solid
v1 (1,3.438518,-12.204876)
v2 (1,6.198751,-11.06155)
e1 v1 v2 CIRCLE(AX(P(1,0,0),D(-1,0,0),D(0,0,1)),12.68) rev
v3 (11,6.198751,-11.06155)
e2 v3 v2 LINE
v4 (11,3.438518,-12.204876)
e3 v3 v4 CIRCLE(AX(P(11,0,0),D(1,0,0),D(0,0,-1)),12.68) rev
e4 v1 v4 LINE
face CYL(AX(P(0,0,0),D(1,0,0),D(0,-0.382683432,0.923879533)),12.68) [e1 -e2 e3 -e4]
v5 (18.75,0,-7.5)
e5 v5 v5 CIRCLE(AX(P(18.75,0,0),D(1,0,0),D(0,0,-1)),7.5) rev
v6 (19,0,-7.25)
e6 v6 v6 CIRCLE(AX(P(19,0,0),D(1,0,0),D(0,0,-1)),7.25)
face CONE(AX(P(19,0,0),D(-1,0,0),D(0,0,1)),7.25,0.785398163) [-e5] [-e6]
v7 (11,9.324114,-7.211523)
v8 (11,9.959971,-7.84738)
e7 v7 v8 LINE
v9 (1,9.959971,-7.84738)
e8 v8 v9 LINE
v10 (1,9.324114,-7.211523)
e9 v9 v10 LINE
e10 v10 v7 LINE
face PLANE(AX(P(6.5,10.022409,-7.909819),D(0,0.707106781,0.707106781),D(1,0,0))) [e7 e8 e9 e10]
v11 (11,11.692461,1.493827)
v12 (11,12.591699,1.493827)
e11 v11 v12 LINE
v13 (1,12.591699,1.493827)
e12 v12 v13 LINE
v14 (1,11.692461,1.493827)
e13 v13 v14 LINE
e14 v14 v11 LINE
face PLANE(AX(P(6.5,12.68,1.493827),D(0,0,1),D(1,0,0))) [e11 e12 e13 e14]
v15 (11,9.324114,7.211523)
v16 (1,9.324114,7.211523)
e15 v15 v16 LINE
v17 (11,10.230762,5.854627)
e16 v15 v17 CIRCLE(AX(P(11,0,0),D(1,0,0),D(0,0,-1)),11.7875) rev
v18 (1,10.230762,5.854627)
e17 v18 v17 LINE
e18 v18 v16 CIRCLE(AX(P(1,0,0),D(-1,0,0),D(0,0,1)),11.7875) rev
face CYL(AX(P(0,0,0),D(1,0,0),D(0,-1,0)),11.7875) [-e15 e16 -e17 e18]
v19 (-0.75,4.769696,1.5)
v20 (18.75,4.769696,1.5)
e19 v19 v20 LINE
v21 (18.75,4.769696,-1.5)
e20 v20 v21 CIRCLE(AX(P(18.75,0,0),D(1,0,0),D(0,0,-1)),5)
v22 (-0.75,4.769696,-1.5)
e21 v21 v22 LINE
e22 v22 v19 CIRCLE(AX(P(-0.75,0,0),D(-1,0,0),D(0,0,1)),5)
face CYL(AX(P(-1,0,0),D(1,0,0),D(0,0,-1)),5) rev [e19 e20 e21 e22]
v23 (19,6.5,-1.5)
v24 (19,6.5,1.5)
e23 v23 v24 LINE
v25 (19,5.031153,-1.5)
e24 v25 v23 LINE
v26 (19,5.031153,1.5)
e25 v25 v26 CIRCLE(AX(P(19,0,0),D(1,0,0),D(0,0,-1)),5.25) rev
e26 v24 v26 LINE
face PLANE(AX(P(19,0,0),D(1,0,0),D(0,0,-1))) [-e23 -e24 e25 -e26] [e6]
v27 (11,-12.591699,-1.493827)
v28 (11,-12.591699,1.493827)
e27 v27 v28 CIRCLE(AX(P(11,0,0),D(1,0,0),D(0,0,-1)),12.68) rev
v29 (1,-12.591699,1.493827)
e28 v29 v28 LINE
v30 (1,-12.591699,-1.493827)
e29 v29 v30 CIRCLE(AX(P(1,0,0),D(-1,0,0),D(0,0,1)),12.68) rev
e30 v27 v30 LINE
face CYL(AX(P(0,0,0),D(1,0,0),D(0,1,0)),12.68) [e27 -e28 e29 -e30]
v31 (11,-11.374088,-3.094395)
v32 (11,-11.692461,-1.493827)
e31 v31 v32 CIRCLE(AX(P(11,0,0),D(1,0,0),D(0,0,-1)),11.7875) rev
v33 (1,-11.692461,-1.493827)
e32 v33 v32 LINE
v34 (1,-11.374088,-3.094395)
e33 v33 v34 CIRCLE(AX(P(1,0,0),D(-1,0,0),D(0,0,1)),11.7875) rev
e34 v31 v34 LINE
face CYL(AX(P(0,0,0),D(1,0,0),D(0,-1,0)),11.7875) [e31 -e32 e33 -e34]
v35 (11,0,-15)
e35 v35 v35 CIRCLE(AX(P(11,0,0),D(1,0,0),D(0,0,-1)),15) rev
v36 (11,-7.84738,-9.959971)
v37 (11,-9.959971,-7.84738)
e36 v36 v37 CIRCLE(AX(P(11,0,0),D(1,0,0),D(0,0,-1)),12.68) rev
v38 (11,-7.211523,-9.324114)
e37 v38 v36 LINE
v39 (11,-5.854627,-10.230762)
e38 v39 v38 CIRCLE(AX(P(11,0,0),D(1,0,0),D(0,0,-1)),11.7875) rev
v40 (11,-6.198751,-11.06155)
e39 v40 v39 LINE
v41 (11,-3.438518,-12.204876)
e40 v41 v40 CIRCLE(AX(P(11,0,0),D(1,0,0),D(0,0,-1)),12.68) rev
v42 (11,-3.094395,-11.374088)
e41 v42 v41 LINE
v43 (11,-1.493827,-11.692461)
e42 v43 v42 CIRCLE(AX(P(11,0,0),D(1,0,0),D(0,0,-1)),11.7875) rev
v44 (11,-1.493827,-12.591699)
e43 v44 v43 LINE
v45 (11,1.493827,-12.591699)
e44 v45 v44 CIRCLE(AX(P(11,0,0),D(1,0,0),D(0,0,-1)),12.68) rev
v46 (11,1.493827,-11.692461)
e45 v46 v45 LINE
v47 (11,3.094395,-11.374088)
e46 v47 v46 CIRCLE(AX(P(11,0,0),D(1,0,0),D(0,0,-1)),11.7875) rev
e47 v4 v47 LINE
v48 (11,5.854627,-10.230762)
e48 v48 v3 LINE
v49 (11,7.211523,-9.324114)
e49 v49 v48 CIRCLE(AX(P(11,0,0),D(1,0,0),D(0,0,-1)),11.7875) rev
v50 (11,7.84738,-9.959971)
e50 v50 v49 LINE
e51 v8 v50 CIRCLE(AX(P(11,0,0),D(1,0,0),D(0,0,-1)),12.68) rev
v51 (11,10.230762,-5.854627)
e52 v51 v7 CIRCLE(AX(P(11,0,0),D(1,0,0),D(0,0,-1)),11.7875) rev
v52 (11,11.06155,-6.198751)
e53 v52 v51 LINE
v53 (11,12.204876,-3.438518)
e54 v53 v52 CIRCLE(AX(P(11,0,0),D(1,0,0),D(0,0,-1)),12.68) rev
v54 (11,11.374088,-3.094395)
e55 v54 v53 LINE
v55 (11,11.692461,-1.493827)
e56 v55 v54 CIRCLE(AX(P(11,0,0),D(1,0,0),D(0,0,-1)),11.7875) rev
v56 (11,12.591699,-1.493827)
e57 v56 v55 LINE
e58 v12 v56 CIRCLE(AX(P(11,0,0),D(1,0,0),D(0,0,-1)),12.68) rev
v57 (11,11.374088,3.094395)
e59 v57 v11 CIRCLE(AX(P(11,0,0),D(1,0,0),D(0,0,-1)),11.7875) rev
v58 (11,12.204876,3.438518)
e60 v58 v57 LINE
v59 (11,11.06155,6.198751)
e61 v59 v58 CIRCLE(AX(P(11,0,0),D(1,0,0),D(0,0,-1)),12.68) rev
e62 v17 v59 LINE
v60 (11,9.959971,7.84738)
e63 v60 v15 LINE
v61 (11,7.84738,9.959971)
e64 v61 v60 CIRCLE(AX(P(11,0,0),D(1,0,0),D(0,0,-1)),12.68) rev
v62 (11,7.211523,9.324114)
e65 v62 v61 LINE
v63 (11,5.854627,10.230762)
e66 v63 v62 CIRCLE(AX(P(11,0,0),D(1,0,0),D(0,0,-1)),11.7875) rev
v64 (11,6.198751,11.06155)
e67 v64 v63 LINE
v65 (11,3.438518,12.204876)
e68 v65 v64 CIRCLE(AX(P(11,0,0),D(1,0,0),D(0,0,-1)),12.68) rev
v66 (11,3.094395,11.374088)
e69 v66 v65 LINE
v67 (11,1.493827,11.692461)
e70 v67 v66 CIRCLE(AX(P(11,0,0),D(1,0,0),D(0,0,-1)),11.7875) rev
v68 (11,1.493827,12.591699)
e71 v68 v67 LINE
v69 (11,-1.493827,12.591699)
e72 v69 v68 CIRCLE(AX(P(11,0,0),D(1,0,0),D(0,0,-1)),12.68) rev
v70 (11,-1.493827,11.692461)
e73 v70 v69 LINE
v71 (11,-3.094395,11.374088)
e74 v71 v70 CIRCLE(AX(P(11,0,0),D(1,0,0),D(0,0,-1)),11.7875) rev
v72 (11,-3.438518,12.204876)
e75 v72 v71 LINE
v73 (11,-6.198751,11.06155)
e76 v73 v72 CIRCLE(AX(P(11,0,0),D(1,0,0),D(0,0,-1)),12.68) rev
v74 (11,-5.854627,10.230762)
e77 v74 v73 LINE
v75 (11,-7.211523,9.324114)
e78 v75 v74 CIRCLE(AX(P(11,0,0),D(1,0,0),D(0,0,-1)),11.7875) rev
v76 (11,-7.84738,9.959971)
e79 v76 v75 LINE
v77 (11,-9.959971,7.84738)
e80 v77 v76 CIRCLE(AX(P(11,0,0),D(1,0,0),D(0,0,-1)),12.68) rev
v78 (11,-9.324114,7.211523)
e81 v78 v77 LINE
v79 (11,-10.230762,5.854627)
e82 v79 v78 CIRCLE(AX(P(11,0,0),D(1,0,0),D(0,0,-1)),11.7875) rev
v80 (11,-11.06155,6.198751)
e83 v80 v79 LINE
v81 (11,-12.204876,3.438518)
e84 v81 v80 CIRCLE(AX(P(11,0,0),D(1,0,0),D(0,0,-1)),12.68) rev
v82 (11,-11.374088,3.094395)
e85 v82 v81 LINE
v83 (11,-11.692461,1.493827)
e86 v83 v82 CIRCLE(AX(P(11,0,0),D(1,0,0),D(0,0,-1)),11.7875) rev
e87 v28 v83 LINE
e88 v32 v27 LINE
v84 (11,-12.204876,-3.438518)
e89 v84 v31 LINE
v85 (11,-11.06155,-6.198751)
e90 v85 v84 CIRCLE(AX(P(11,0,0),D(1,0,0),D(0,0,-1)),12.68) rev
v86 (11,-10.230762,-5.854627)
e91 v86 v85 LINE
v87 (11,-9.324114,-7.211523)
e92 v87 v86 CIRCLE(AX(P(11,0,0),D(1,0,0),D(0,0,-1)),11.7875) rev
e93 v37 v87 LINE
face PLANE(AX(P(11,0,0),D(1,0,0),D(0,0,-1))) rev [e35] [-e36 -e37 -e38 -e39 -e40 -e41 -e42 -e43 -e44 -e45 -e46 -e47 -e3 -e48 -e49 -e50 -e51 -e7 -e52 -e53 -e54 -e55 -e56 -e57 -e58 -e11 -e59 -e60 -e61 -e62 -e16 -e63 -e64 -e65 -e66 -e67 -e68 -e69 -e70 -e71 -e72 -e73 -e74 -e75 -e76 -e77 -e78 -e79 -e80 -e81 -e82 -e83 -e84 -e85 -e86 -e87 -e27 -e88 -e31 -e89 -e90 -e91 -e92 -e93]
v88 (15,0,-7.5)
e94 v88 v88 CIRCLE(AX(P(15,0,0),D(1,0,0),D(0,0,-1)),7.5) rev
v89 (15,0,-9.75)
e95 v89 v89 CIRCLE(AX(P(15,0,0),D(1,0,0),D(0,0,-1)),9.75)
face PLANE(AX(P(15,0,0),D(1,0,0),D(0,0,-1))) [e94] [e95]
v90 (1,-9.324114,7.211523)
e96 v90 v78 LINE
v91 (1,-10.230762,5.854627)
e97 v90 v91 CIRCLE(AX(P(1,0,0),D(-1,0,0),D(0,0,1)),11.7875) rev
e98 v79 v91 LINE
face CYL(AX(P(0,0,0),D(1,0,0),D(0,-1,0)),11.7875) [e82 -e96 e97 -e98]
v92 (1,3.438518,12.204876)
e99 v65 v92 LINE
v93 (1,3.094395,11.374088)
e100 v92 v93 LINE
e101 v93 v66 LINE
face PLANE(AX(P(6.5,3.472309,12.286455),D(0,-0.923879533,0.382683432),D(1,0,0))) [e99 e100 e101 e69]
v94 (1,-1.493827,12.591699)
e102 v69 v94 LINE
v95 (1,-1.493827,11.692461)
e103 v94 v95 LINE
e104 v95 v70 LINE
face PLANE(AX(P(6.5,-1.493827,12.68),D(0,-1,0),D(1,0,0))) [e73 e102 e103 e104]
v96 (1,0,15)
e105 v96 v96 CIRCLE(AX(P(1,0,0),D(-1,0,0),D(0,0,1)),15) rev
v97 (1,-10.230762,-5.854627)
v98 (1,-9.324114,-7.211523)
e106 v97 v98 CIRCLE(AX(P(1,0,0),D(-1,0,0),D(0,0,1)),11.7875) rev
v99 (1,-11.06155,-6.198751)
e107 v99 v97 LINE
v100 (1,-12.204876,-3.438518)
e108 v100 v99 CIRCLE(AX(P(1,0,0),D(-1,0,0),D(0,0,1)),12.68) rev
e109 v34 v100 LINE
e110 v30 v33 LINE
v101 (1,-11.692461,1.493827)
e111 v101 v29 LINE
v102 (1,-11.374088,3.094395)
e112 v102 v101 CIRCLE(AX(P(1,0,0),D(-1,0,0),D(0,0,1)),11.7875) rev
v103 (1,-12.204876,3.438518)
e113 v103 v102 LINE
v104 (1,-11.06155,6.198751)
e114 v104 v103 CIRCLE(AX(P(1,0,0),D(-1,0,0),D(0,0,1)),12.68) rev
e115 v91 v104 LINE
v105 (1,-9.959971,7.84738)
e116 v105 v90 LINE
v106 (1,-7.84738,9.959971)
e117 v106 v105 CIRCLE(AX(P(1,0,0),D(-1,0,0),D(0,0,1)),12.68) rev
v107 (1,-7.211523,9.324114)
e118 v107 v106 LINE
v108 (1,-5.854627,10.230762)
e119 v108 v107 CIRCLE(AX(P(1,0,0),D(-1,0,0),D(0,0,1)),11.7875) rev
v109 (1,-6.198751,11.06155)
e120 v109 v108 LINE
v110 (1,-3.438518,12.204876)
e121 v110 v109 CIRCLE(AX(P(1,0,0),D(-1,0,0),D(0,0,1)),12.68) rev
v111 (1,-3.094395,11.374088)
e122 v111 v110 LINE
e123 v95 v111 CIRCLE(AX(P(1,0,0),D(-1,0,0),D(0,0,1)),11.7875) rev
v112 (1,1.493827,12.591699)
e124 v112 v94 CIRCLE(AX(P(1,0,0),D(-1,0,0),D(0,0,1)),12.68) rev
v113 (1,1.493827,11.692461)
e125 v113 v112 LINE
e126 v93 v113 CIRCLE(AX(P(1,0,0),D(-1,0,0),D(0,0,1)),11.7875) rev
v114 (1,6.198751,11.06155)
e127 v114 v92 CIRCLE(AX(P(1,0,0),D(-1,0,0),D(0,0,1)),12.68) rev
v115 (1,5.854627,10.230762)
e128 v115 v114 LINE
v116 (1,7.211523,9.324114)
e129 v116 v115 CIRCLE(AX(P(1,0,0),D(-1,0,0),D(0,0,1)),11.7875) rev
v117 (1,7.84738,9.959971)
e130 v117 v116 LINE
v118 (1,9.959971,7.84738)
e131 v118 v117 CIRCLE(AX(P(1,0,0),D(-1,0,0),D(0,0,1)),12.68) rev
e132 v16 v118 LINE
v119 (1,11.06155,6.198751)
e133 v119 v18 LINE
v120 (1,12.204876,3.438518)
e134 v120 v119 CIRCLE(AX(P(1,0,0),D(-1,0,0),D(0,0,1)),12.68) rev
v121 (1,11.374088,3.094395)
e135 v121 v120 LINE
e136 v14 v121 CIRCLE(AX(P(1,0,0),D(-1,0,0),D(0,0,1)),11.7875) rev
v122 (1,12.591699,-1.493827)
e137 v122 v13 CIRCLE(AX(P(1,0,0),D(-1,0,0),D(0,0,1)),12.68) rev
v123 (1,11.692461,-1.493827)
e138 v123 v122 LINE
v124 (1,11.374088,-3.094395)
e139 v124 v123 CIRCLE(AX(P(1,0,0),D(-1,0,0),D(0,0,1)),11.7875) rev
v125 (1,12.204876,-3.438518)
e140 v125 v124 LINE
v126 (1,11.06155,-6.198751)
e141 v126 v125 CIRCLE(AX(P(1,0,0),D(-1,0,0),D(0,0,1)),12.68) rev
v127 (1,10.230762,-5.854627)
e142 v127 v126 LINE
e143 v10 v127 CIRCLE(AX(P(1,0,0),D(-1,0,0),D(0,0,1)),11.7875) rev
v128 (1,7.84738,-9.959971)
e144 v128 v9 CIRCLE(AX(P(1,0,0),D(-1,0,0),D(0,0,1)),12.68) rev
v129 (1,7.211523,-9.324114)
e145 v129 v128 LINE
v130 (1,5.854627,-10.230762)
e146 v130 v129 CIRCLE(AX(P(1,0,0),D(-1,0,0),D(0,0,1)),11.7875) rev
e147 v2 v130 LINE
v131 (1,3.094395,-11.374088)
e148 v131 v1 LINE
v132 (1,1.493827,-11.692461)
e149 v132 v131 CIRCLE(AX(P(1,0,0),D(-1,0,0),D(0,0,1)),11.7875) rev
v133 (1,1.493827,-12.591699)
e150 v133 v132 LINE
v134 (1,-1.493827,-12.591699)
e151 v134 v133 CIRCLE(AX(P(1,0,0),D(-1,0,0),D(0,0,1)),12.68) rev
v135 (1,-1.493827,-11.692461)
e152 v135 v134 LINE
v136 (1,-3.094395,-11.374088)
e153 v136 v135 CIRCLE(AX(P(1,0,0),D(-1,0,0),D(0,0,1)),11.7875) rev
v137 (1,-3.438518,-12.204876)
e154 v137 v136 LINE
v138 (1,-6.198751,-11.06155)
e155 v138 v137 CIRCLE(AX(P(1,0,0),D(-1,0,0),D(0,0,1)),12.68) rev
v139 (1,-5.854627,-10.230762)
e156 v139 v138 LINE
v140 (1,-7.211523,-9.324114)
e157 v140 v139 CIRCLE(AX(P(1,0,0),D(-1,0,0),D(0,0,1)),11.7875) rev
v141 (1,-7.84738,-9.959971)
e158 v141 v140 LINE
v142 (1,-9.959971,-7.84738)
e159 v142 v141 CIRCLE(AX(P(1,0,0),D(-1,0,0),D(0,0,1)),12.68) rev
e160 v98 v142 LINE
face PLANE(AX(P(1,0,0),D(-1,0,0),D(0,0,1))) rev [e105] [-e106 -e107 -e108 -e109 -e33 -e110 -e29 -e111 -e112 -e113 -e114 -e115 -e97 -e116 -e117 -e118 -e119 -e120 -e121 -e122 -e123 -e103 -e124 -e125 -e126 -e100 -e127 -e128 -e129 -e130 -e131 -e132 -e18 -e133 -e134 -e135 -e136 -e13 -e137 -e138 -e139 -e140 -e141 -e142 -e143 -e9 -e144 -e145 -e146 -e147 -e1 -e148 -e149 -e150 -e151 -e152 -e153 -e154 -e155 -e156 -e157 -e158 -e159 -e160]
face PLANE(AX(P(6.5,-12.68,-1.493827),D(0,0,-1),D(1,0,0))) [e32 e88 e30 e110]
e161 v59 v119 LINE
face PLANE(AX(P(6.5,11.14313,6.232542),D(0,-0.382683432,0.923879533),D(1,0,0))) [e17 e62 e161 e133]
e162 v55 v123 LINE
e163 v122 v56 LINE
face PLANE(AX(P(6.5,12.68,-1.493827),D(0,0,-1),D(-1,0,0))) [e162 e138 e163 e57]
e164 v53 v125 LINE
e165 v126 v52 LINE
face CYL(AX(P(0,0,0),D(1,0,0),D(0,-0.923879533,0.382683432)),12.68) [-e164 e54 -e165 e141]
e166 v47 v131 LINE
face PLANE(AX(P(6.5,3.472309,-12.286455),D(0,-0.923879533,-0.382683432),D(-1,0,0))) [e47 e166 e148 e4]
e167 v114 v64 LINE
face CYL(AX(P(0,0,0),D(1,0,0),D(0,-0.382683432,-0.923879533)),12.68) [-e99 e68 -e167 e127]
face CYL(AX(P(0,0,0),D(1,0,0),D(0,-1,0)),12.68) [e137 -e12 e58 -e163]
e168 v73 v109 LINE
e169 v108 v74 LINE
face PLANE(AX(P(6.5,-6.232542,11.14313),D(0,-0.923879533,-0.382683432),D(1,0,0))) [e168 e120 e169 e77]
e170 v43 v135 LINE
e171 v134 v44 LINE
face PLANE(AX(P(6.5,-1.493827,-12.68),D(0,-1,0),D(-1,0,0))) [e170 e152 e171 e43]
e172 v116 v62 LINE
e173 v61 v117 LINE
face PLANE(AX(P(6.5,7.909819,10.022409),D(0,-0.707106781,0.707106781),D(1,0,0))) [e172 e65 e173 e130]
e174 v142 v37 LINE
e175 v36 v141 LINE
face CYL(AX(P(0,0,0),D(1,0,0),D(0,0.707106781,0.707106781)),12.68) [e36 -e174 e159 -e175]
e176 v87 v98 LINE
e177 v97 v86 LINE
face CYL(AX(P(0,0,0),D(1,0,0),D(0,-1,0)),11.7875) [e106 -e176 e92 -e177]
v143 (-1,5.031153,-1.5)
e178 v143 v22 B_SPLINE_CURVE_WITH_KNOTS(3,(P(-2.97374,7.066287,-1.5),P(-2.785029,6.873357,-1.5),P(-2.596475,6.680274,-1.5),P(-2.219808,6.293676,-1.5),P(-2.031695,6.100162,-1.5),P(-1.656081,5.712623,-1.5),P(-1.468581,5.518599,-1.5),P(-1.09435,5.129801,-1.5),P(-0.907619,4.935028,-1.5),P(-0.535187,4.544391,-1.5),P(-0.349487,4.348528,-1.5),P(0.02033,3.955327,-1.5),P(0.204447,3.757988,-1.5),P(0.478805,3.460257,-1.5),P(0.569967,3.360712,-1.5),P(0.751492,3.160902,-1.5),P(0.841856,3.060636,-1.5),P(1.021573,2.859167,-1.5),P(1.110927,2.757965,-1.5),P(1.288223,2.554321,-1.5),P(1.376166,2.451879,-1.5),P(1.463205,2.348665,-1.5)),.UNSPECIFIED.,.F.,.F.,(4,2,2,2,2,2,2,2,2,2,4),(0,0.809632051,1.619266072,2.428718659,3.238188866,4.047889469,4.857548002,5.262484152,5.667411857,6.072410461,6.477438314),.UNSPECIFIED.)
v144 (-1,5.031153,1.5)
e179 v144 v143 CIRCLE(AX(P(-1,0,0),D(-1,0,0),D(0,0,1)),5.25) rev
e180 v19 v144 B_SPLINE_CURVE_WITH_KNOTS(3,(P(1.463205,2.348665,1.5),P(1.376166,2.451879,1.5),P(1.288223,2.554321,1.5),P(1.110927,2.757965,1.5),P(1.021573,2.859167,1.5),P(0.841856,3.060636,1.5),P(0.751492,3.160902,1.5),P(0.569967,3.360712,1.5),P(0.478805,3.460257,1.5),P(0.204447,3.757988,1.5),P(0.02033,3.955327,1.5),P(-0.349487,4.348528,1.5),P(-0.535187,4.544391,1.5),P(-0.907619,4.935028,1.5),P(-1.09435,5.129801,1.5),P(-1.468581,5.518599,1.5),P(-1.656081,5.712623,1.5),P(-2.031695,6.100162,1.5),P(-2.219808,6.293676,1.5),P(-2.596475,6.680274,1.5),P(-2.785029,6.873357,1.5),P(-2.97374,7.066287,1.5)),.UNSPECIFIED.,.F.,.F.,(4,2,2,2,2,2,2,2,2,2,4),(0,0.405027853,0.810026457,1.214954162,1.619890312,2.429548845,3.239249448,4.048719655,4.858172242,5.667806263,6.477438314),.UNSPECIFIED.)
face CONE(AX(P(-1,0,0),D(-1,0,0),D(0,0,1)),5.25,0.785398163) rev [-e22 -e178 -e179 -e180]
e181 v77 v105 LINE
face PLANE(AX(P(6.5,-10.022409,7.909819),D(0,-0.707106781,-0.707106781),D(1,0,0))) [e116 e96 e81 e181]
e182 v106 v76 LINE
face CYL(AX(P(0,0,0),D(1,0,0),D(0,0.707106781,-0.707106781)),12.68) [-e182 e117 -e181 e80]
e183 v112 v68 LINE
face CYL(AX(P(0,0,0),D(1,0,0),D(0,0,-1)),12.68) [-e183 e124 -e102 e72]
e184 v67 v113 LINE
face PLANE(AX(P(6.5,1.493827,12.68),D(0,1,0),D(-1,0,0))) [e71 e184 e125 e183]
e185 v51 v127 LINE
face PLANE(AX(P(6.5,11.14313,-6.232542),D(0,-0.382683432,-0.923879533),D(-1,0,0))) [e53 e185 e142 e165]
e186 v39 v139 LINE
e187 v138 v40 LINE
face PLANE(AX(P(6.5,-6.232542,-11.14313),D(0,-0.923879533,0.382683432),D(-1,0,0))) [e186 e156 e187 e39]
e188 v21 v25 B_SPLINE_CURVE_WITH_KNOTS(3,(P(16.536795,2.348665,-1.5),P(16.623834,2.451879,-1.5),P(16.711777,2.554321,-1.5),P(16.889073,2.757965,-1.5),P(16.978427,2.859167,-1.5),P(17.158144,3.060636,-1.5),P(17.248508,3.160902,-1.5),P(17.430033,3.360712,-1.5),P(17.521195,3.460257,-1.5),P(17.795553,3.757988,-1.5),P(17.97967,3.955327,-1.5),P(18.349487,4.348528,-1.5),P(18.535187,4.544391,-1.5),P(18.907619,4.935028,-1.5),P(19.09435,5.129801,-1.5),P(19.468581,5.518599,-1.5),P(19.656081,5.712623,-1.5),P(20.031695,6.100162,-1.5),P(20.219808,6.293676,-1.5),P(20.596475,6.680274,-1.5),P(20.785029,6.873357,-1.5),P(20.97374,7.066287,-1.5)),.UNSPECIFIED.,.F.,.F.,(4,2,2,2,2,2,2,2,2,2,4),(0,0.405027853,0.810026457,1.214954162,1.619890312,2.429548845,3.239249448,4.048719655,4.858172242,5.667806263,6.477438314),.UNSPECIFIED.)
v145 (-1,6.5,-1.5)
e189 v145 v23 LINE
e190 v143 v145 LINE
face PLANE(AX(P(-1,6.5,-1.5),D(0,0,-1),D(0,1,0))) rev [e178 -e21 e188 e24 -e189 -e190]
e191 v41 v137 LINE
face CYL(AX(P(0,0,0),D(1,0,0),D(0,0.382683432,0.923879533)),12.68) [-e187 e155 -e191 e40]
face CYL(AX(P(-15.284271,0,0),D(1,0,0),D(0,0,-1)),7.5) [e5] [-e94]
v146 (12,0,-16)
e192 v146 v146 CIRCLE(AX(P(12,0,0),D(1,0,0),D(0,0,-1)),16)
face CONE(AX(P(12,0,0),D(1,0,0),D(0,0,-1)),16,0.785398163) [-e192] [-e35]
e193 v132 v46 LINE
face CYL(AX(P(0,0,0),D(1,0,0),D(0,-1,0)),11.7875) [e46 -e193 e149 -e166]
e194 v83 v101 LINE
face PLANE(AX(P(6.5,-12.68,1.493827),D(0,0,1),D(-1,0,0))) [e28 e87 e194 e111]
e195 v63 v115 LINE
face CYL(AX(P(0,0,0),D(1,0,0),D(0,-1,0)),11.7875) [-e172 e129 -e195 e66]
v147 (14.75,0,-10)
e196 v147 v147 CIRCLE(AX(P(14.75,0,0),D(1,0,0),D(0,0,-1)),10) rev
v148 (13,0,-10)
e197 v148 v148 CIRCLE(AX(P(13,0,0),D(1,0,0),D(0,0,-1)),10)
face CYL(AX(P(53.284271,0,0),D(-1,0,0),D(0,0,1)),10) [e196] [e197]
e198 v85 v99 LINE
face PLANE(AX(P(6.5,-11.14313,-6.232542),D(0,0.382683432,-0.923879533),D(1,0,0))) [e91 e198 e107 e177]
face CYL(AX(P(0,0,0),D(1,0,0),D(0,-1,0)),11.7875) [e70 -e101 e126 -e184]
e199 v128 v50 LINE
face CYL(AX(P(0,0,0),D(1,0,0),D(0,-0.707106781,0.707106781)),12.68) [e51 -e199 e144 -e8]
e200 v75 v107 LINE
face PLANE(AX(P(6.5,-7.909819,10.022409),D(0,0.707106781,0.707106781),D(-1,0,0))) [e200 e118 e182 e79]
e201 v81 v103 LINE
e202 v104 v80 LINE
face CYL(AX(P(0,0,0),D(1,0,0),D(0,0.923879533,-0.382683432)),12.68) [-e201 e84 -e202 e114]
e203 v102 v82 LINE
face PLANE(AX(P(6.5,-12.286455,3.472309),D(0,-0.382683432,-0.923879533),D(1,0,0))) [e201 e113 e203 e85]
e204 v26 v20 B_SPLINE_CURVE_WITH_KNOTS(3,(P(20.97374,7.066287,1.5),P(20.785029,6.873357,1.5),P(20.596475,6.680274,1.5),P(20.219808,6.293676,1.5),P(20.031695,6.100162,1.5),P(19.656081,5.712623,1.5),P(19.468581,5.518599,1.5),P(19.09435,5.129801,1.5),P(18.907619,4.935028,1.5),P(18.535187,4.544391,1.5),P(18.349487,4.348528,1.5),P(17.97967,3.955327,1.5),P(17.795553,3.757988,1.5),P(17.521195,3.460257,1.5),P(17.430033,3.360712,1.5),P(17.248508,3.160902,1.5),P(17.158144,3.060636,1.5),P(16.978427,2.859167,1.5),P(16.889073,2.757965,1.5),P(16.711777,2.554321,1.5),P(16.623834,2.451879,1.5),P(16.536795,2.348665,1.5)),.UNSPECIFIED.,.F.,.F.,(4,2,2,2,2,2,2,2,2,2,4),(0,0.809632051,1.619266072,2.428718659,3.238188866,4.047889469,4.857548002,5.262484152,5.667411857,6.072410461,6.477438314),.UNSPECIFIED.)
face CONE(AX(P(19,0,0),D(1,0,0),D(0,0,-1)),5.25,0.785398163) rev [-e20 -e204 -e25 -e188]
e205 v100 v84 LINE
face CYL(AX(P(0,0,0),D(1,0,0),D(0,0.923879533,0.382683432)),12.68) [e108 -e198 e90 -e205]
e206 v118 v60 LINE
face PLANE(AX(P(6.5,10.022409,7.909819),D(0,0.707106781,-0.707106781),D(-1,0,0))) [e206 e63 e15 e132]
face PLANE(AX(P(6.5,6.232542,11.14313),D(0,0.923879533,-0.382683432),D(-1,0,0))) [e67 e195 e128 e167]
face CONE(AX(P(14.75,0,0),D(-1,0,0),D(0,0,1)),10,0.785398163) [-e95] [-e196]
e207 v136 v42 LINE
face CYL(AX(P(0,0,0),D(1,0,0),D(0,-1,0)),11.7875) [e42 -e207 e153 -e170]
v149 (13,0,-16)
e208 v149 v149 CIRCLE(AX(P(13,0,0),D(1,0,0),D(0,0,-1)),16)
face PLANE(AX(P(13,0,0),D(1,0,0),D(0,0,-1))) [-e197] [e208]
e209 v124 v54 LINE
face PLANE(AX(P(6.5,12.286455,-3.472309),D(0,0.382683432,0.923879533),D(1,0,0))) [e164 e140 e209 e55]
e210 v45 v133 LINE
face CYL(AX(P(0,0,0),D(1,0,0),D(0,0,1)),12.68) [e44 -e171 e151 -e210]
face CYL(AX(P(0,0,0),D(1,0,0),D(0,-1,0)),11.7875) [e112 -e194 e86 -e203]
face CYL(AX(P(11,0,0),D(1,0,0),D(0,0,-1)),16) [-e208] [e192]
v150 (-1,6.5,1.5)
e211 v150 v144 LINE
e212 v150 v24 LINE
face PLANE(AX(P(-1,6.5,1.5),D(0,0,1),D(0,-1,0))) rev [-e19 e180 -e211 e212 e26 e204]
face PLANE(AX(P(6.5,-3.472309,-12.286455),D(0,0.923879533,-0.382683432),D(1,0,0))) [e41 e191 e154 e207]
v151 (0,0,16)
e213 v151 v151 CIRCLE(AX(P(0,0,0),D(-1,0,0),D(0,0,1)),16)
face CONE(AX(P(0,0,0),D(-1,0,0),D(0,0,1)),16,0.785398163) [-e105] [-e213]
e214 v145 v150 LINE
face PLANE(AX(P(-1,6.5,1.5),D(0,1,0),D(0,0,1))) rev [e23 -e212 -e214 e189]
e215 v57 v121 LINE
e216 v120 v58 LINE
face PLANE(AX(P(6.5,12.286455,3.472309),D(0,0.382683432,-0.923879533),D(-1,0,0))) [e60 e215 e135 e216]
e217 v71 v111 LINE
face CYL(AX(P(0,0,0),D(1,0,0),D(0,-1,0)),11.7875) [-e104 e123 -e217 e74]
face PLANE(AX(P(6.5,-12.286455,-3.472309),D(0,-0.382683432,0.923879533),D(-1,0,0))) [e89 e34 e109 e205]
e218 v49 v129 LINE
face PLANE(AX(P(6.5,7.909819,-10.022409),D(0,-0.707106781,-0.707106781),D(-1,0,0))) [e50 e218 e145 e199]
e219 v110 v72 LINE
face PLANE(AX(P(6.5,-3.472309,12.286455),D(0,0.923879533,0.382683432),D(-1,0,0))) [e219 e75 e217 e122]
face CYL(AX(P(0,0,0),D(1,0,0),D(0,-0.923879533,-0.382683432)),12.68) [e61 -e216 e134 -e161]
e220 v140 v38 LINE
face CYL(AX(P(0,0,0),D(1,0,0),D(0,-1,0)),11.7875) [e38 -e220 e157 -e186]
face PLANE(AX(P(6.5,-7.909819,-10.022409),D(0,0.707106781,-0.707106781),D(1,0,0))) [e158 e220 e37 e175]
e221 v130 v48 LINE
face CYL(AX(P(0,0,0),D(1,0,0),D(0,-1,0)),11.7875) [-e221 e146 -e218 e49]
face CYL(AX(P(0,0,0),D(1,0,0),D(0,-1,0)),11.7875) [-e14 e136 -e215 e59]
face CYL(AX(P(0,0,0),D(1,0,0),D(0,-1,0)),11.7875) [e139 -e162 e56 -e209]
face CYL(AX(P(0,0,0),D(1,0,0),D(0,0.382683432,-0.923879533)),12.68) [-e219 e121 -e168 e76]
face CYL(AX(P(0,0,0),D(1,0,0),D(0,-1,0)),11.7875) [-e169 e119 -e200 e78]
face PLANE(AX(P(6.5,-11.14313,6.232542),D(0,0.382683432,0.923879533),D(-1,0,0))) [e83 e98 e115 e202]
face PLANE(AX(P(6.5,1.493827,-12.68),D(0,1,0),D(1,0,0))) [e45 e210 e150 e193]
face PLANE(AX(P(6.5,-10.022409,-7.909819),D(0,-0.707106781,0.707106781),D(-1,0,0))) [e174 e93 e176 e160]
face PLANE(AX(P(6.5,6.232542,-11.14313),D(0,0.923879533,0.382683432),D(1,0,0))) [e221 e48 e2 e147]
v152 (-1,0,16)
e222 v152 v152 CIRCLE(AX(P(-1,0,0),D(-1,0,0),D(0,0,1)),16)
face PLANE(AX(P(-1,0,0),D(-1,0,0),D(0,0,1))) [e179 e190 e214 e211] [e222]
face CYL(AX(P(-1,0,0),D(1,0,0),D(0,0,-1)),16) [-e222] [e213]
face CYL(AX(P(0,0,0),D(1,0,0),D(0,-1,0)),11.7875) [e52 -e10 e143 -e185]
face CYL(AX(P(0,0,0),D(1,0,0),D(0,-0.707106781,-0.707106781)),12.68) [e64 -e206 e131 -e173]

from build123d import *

# Parameters (mm, degrees)
BOSS_EXTRUDE1_START       = -13
BOSS_EXTRUDE1_DEPTH       = 14
BOSS_EXTRUDE1_START_2     = -25
BOSS_EXTRUDE1_2_OUTLINE_R = 9
BOSS_EXTRUDE1_2_DEPTH     = 12
BOSS_EXTRUDE1_START_3     = -1
BOSS_EXTRUDE1_3_OUTLINE_R = 16
BOSS_EXTRUDE1_3_DEPTH     = 2
BOSS_EXTRUDE1_4_OUTLINE_R = 14.25
BOSS_EXTRUDE1_4_DEPTH     = 0.9999999
SKETCH5_R                 = 16
BOSS_EXTRUDE3_DEPTH       = 2
SKETCH6_R                 = 10
BOSS_EXTRUDE4_DEPTH       = 12
CHAMFER1_SIZE             = 1
CUT_EXTRUDE1_START        = -10
SKETCH2_R                 = 10
SKETCH2_R_2               = 7.5
CUT_EXTRUDE1_DEPTH        = 10
CUT_EXTRUDE2_DEPTH        = 28.712812921
CUT_EXTRUDE2_DEPTH_BACK   = 28.712812921
SKETCH4_R                 = 5
CUT_EXTRUDE3_START        = -6
SKETCH7_R                 = 7.5
CUT_EXTRUDE3_DEPTH        = 6
CHAMFER2_SIZE             = 0.25
SKETCH8_W                 = 3
SKETCH8_H                 = 3
CUT_EXTRUDE4_DEPTH        = 31.199337741


with BuildPart() as part:
    # Boss-Extrude1: read off the stored shape, not the designer's step
    # Boss-Extrude1 outline → Boss-Extrude1 (new body)
    with BuildSketch(Plane.ZY.offset(BOSS_EXTRUDE1_START)):
        with BuildLine():
            ThreePointArc((-1.493827307, 11.692460658), (-2.299627171, 11.561006493), (-3.094394503, 11.374088047))
            Line((-3.094394503, 11.374088047), (-3.438518062, 12.20487581))
            ThreePointArc((-3.438518062, 12.20487581), (-4.852425922, 11.714792472), (-6.19875101, 11.061549888))
            Line((-6.19875101, 11.061549888), (-5.854627451, 10.230762125))
            ThreePointArc((-5.854627451, 10.230762125), (-6.548784122, 9.800948055), (-7.211522801, 9.324113638))
            Line((-7.211522801, 9.324113638), (-7.847380226, 9.959971063))
            ThreePointArc((-7.847380226, 9.959971063), (-8.966113985, 8.966113985), (-9.959971063, 7.847380226))
            Line((-9.959971063, 7.847380226), (-9.324113638, 7.211522801))
            ThreePointArc((-9.324113638, 7.211522801), (-9.800948055, 6.548784122), (-10.230762125, 5.854627451))
            Line((-10.230762125, 5.854627451), (-11.061549888, 6.19875101))
            ThreePointArc((-11.061549888, 6.19875101), (-11.714792472, 4.852425922), (-12.20487581, 3.438518062))
            Line((-12.20487581, 3.438518062), (-11.374088047, 3.094394503))
            ThreePointArc((-11.374088047, 3.094394503), (-11.561006493, 2.299627171), (-11.692460658, 1.493827307))
            Line((-11.692460658, 1.493827307), (-12.591698852, 1.493827307))
            ThreePointArc((-12.591698852, 1.493827307), (-12.68, 0), (-12.591698852, -1.493827307))
            Line((-12.591698852, -1.493827307), (-11.692460658, -1.493827307))
            ThreePointArc((-11.692460658, -1.493827307), (-11.561006493, -2.299627171), (-11.374088047, -3.094394503))
            Line((-11.374088047, -3.094394503), (-12.20487581, -3.438518062))
            ThreePointArc((-12.20487581, -3.438518062), (-11.714792472, -4.852425922), (-11.061549888, -6.19875101))
            Line((-11.061549888, -6.19875101), (-10.230762125, -5.854627451))
            ThreePointArc((-10.230762125, -5.854627451), (-9.800948055, -6.548784122), (-9.324113638, -7.211522801))
            Line((-9.324113638, -7.211522801), (-9.959971063, -7.847380226))
            ThreePointArc((-9.959971063, -7.847380226), (-8.966113985, -8.966113985), (-7.847380226, -9.959971063))
            Line((-7.847380226, -9.959971063), (-7.211522801, -9.324113638))
            ThreePointArc((-7.211522801, -9.324113638), (-6.548784122, -9.800948055), (-5.854627451, -10.230762125))
            Line((-5.854627451, -10.230762125), (-6.19875101, -11.061549888))
            ThreePointArc((-6.19875101, -11.061549888), (-4.852425922, -11.714792472), (-3.438518062, -12.20487581))
            Line((-3.438518062, -12.20487581), (-3.094394503, -11.374088047))
            ThreePointArc((-3.094394503, -11.374088047), (-2.299627171, -11.561006493), (-1.493827307, -11.692460658))
            Line((-1.493827307, -11.692460658), (-1.493827307, -12.591698852))
            ThreePointArc((-1.493827307, -12.591698852), (0, -12.68), (1.493827307, -12.591698852))
            Line((1.493827307, -12.591698852), (1.493827307, -11.692460658))
            ThreePointArc((1.493827307, -11.692460658), (2.299627171, -11.561006493), (3.094394503, -11.374088047))
            Line((3.094394503, -11.374088047), (3.438518062, -12.20487581))
            ThreePointArc((3.438518062, -12.20487581), (4.852425922, -11.714792472), (6.19875101, -11.061549888))
            Line((6.19875101, -11.061549888), (5.854627451, -10.230762125))
            ThreePointArc((5.854627451, -10.230762125), (6.548784122, -9.800948055), (7.211522801, -9.324113638))
            Line((7.211522801, -9.324113638), (7.847380226, -9.959971063))
            ThreePointArc((7.847380226, -9.959971063), (8.966113985, -8.966113985), (9.959971063, -7.847380226))
            Line((9.959971063, -7.847380226), (9.324113638, -7.211522801))
            ThreePointArc((9.324113638, -7.211522801), (9.800948055, -6.548784122), (10.230762125, -5.854627451))
            Line((10.230762125, -5.854627451), (11.061549888, -6.19875101))
            ThreePointArc((11.061549888, -6.19875101), (11.714792472, -4.852425922), (12.20487581, -3.438518062))
            Line((12.20487581, -3.438518062), (11.374088047, -3.094394503))
            ThreePointArc((11.374088047, -3.094394503), (11.561006493, -2.299627171), (11.692460658, -1.493827307))
            Line((11.692460658, -1.493827307), (12.591698852, -1.493827307))
            ThreePointArc((12.591698852, -1.493827307), (12.68, 0), (12.591698852, 1.493827307))
            Line((12.591698852, 1.493827307), (11.692460658, 1.493827307))
            ThreePointArc((11.692460658, 1.493827307), (11.561006493, 2.299627171), (11.374088047, 3.094394503))
            Line((11.374088047, 3.094394503), (12.20487581, 3.438518062))
            ThreePointArc((12.20487581, 3.438518062), (11.714792472, 4.852425922), (11.061549888, 6.19875101))
            Line((11.061549888, 6.19875101), (10.230762125, 5.854627451))
            ThreePointArc((10.230762125, 5.854627451), (9.800948055, 6.548784122), (9.324113638, 7.211522801))
            Line((9.324113638, 7.211522801), (9.959971063, 7.847380226))
            ThreePointArc((9.959971063, 7.847380226), (8.966113985, 8.966113985), (7.847380226, 9.959971063))
            Line((7.847380226, 9.959971063), (7.211522801, 9.324113638))
            ThreePointArc((7.211522801, 9.324113638), (6.548784122, 9.800948055), (5.854627451, 10.230762125))
            Line((5.854627451, 10.230762125), (6.19875101, 11.061549888))
            ThreePointArc((6.19875101, 11.061549888), (4.852425922, 11.714792472), (3.438518062, 12.20487581))
            Line((3.438518062, 12.20487581), (3.094394503, 11.374088047))
            ThreePointArc((3.094394503, 11.374088047), (2.299627171, 11.561006493), (1.493827307, 11.692460658))
            Line((1.493827307, 11.692460658), (1.493827307, 12.591698852))
            ThreePointArc((1.493827307, 12.591698852), (0, 12.68), (-1.493827307, 12.591698852))
            Line((-1.493827307, 12.591698852), (-1.493827307, 11.692460658))
        make_face()
    extrude(amount=BOSS_EXTRUDE1_DEPTH)

    # Boss-Extrude1 2 outline → Boss-Extrude1 2 (add)
    with BuildSketch(Plane.ZY.offset(BOSS_EXTRUDE1_START_2)):
        Circle(BOSS_EXTRUDE1_2_OUTLINE_R)
    extrude(amount=BOSS_EXTRUDE1_2_DEPTH)

    # Boss-Extrude1 3 outline → Boss-Extrude1 3 (add)
    with BuildSketch(Plane.ZY.offset(BOSS_EXTRUDE1_START_3)):
        Circle(BOSS_EXTRUDE1_3_OUTLINE_R)
        with BuildLine():
            Line((-3.438518062, 12.20487581), (-3.094394503, 11.374088047))
            ThreePointArc((-3.094394503, 11.374088047), (-2.299627171, 11.561006493), (-1.493827307, 11.692460658))
            Line((-1.493827307, 11.692460658), (-1.493827307, 12.591698852))
            ThreePointArc((-1.493827307, 12.591698852), (0, 12.68), (1.493827307, 12.591698852))
            Line((1.493827307, 12.591698852), (1.493827307, 11.692460658))
            ThreePointArc((1.493827307, 11.692460658), (2.299627171, 11.561006493), (3.094394503, 11.374088047))
            Line((3.094394503, 11.374088047), (3.438518062, 12.20487581))
            ThreePointArc((3.438518062, 12.20487581), (4.852425922, 11.714792472), (6.19875101, 11.061549888))
            Line((6.19875101, 11.061549888), (5.854627451, 10.230762125))
            ThreePointArc((5.854627451, 10.230762125), (6.548784122, 9.800948055), (7.211522801, 9.324113638))
            Line((7.211522801, 9.324113638), (7.847380226, 9.959971063))
            ThreePointArc((7.847380226, 9.959971063), (8.966113985, 8.966113985), (9.959971063, 7.847380226))
            Line((9.959971063, 7.847380226), (9.324113638, 7.211522801))
            ThreePointArc((9.324113638, 7.211522801), (9.800948055, 6.548784122), (10.230762125, 5.854627451))
            Line((10.230762125, 5.854627451), (11.061549888, 6.19875101))
            ThreePointArc((11.061549888, 6.19875101), (11.714792472, 4.852425922), (12.20487581, 3.438518062))
            Line((12.20487581, 3.438518062), (11.374088047, 3.094394503))
            ThreePointArc((11.374088047, 3.094394503), (11.561006493, 2.299627171), (11.692460658, 1.493827307))
            Line((11.692460658, 1.493827307), (12.591698852, 1.493827307))
            ThreePointArc((12.591698852, 1.493827307), (12.68, 0), (12.591698852, -1.493827307))
            Line((12.591698852, -1.493827307), (11.692460658, -1.493827307))
            ThreePointArc((11.692460658, -1.493827307), (11.561006493, -2.299627171), (11.374088047, -3.094394503))
            Line((11.374088047, -3.094394503), (12.20487581, -3.438518062))
            ThreePointArc((12.20487581, -3.438518062), (11.714792472, -4.852425922), (11.061549888, -6.19875101))
            Line((11.061549888, -6.19875101), (10.230762125, -5.854627451))
            ThreePointArc((10.230762125, -5.854627451), (9.800948055, -6.548784122), (9.324113638, -7.211522801))
            Line((9.324113638, -7.211522801), (9.959971063, -7.847380226))
            ThreePointArc((9.959971063, -7.847380226), (8.966113985, -8.966113985), (7.847380226, -9.959971063))
            Line((7.847380226, -9.959971063), (7.211522801, -9.324113638))
            ThreePointArc((7.211522801, -9.324113638), (6.548784122, -9.800948055), (5.854627451, -10.230762125))
            Line((5.854627451, -10.230762125), (6.19875101, -11.061549888))
            ThreePointArc((6.19875101, -11.061549888), (4.852425922, -11.714792472), (3.438518062, -12.20487581))
            Line((3.438518062, -12.20487581), (3.094394503, -11.374088047))
            ThreePointArc((3.094394503, -11.374088047), (2.299627171, -11.561006493), (1.493827307, -11.692460658))
            Line((1.493827307, -11.692460658), (1.493827307, -12.591698852))
            ThreePointArc((1.493827307, -12.591698852), (0, -12.68), (-1.493827307, -12.591698852))
            Line((-1.493827307, -12.591698852), (-1.493827307, -11.692460658))
            ThreePointArc((-1.493827307, -11.692460658), (-2.299627171, -11.561006493), (-3.094394503, -11.374088047))
            Line((-3.094394503, -11.374088047), (-3.438518062, -12.20487581))
            ThreePointArc((-3.438518062, -12.20487581), (-4.852425922, -11.714792472), (-6.19875101, -11.061549888))
            Line((-6.19875101, -11.061549888), (-5.854627451, -10.230762125))
            ThreePointArc((-5.854627451, -10.230762125), (-6.548784122, -9.800948055), (-7.211522801, -9.324113638))
            Line((-7.211522801, -9.324113638), (-7.847380226, -9.959971063))
            ThreePointArc((-7.847380226, -9.959971063), (-8.966113985, -8.966113985), (-9.959971063, -7.847380226))
            Line((-9.959971063, -7.847380226), (-9.324113638, -7.211522801))
            ThreePointArc((-9.324113638, -7.211522801), (-9.800948055, -6.548784122), (-10.230762125, -5.854627451))
            Line((-10.230762125, -5.854627451), (-11.061549888, -6.19875101))
            ThreePointArc((-11.061549888, -6.19875101), (-11.714792472, -4.852425922), (-12.20487581, -3.438518062))
            Line((-12.20487581, -3.438518062), (-11.374088047, -3.094394503))
            ThreePointArc((-11.374088047, -3.094394503), (-11.561006493, -2.299627171), (-11.692460658, -1.493827307))
            Line((-11.692460658, -1.493827307), (-12.591698852, -1.493827307))
            ThreePointArc((-12.591698852, -1.493827307), (-12.68, 0), (-12.591698852, 1.493827307))
            Line((-12.591698852, 1.493827307), (-11.692460658, 1.493827307))
            ThreePointArc((-11.692460658, 1.493827307), (-11.561006493, 2.299627171), (-11.374088047, 3.094394503))
            Line((-11.374088047, 3.094394503), (-12.20487581, 3.438518062))
            ThreePointArc((-12.20487581, 3.438518062), (-11.714792472, 4.852425922), (-11.061549888, 6.19875101))
            Line((-11.061549888, 6.19875101), (-10.230762125, 5.854627451))
            ThreePointArc((-10.230762125, 5.854627451), (-9.800948055, 6.548784122), (-9.324113638, 7.211522801))
            Line((-9.324113638, 7.211522801), (-9.959971063, 7.847380226))
            ThreePointArc((-9.959971063, 7.847380226), (-8.966113985, 8.966113985), (-7.847380226, 9.959971063))
            Line((-7.847380226, 9.959971063), (-7.211522801, 9.324113638))
            ThreePointArc((-7.211522801, 9.324113638), (-6.548784122, 9.800948055), (-5.854627451, 10.230762125))
            Line((-5.854627451, 10.230762125), (-6.19875101, 11.061549888))
            ThreePointArc((-6.19875101, 11.061549888), (-4.852425922, 11.714792472), (-3.438518062, 12.20487581))
        make_face(mode=Mode.SUBTRACT)
    extrude(amount=BOSS_EXTRUDE1_3_DEPTH)

    # Boss-Extrude1 4 outline → Boss-Extrude1 4 (add)
    with BuildSketch(Plane.ZY.offset(BOSS_EXTRUDE1_START)):
        Circle(BOSS_EXTRUDE1_4_OUTLINE_R)
        with BuildLine():
            Line((-3.438518062, 12.20487581), (-3.094394503, 11.374088047))
            ThreePointArc((-3.094394503, 11.374088047), (-2.299627171, 11.561006493), (-1.493827307, 11.692460658))
            Line((-1.493827307, 11.692460658), (-1.493827307, 12.591698852))
            ThreePointArc((-1.493827307, 12.591698852), (0, 12.68), (1.493827307, 12.591698852))
            Line((1.493827307, 12.591698852), (1.493827307, 11.692460658))
            ThreePointArc((1.493827307, 11.692460658), (2.299627171, 11.561006493), (3.094394503, 11.374088047))
            Line((3.094394503, 11.374088047), (3.438518062, 12.20487581))
            ThreePointArc((3.438518062, 12.20487581), (4.852425922, 11.714792472), (6.19875101, 11.061549888))
            Line((6.19875101, 11.061549888), (5.854627451, 10.230762125))
            ThreePointArc((5.854627451, 10.230762125), (6.548784122, 9.800948055), (7.211522801, 9.324113638))
            Line((7.211522801, 9.324113638), (7.847380226, 9.959971063))
            ThreePointArc((7.847380226, 9.959971063), (8.966113985, 8.966113985), (9.959971063, 7.847380226))
            Line((9.959971063, 7.847380226), (9.324113638, 7.211522801))
            ThreePointArc((9.324113638, 7.211522801), (9.800948055, 6.548784122), (10.230762125, 5.854627451))
            Line((10.230762125, 5.854627451), (11.061549888, 6.19875101))
            ThreePointArc((11.061549888, 6.19875101), (11.714792472, 4.852425922), (12.20487581, 3.438518062))
            Line((12.20487581, 3.438518062), (11.374088047, 3.094394503))
            ThreePointArc((11.374088047, 3.094394503), (11.561006493, 2.299627171), (11.692460658, 1.493827307))
            Line((11.692460658, 1.493827307), (12.591698852, 1.493827307))
            ThreePointArc((12.591698852, 1.493827307), (12.68, 0), (12.591698852, -1.493827307))
            Line((12.591698852, -1.493827307), (11.692460658, -1.493827307))
            ThreePointArc((11.692460658, -1.493827307), (11.561006493, -2.299627171), (11.374088047, -3.094394503))
            Line((11.374088047, -3.094394503), (12.20487581, -3.438518062))
            ThreePointArc((12.20487581, -3.438518062), (11.714792472, -4.852425922), (11.061549888, -6.19875101))
            Line((11.061549888, -6.19875101), (10.230762125, -5.854627451))
            ThreePointArc((10.230762125, -5.854627451), (9.800948055, -6.548784122), (9.324113638, -7.211522801))
            Line((9.324113638, -7.211522801), (9.959971063, -7.847380226))
            ThreePointArc((9.959971063, -7.847380226), (8.966113985, -8.966113985), (7.847380226, -9.959971063))
            Line((7.847380226, -9.959971063), (7.211522801, -9.324113638))
            ThreePointArc((7.211522801, -9.324113638), (6.548784122, -9.800948055), (5.854627451, -10.230762125))
            Line((5.854627451, -10.230762125), (6.19875101, -11.061549888))
            ThreePointArc((6.19875101, -11.061549888), (4.852425922, -11.714792472), (3.438518062, -12.20487581))
            Line((3.438518062, -12.20487581), (3.094394503, -11.374088047))
            ThreePointArc((3.094394503, -11.374088047), (2.299627171, -11.561006493), (1.493827307, -11.692460658))
            Line((1.493827307, -11.692460658), (1.493827307, -12.591698852))
            ThreePointArc((1.493827307, -12.591698852), (0, -12.68), (-1.493827307, -12.591698852))
            Line((-1.493827307, -12.591698852), (-1.493827307, -11.692460658))
            ThreePointArc((-1.493827307, -11.692460658), (-2.299627171, -11.561006493), (-3.094394503, -11.374088047))
            Line((-3.094394503, -11.374088047), (-3.438518062, -12.20487581))
            ThreePointArc((-3.438518062, -12.20487581), (-4.852425922, -11.714792472), (-6.19875101, -11.061549888))
            Line((-6.19875101, -11.061549888), (-5.854627451, -10.230762125))
            ThreePointArc((-5.854627451, -10.230762125), (-6.548784122, -9.800948055), (-7.211522801, -9.324113638))
            Line((-7.211522801, -9.324113638), (-7.847380226, -9.959971063))
            ThreePointArc((-7.847380226, -9.959971063), (-8.966113985, -8.966113985), (-9.959971063, -7.847380226))
            Line((-9.959971063, -7.847380226), (-9.324113638, -7.211522801))
            ThreePointArc((-9.324113638, -7.211522801), (-9.800948055, -6.548784122), (-10.230762125, -5.854627451))
            Line((-10.230762125, -5.854627451), (-11.061549888, -6.19875101))
            ThreePointArc((-11.061549888, -6.19875101), (-11.714792472, -4.852425922), (-12.20487581, -3.438518062))
            Line((-12.20487581, -3.438518062), (-11.374088047, -3.094394503))
            ThreePointArc((-11.374088047, -3.094394503), (-11.561006493, -2.299627171), (-11.692460658, -1.493827307))
            Line((-11.692460658, -1.493827307), (-12.591698852, -1.493827307))
            ThreePointArc((-12.591698852, -1.493827307), (-12.68, 0), (-12.591698852, 1.493827307))
            Line((-12.591698852, 1.493827307), (-11.692460658, 1.493827307))
            ThreePointArc((-11.692460658, 1.493827307), (-11.561006493, 2.299627171), (-11.374088047, 3.094394503))
            Line((-11.374088047, 3.094394503), (-12.20487581, 3.438518062))
            ThreePointArc((-12.20487581, 3.438518062), (-11.714792472, 4.852425922), (-11.061549888, 6.19875101))
            Line((-11.061549888, 6.19875101), (-10.230762125, 5.854627451))
            ThreePointArc((-10.230762125, 5.854627451), (-9.800948055, 6.548784122), (-9.324113638, 7.211522801))
            Line((-9.324113638, 7.211522801), (-9.959971063, 7.847380226))
            ThreePointArc((-9.959971063, 7.847380226), (-8.966113985, 8.966113985), (-7.847380226, 9.959971063))
            Line((-7.847380226, 9.959971063), (-7.211522801, 9.324113638))
            ThreePointArc((-7.211522801, 9.324113638), (-6.548784122, 9.800948055), (-5.854627451, 10.230762125))
            Line((-5.854627451, 10.230762125), (-6.19875101, 11.061549888))
            ThreePointArc((-6.19875101, 11.061549888), (-4.852425922, 11.714792472), (-3.438518062, 12.20487581))
        make_face(mode=Mode.SUBTRACT)
    extrude(amount=BOSS_EXTRUDE1_4_DEPTH)

    # Boss-Extrude1 5 outline → Boss-Extrude1 5 (revolve)
    with BuildSketch(Plane.YX):
        Polygon((11.7875, 12.0000001), (11.7875, 11), (13.25, 11), (14.25, 12), align=None)
    revolve(axis=Axis((0, 0, 0), (1, 0, 0)))

    # Sketch5 → Boss-Extrude3 (add)
    with BuildSketch(Plane(origin=(13, 0, 0), x_dir=(0, 0, -1), z_dir=(1, 0, 0))):
        with Locations(Location((0, 0, 0), (0, 0, 180))):
            Circle(SKETCH5_R)
    extrude(amount=-BOSS_EXTRUDE3_DEPTH)

    # Sketch6 → Boss-Extrude4 (add)
    with BuildSketch(Plane(origin=(13, 0, 0), x_dir=(0, 0, -1), z_dir=(1, 0, 0))):
        Circle(SKETCH6_R)
    extrude(amount=BOSS_EXTRUDE4_DEPTH)

    # Chamfer1
    chamfer1_edges = [part.edges().sort_by_distance(p)[0] for p in [
        (1, 0, -16),
        (11, 0, -16),
    ]]
    chamfer(chamfer1_edges, length=CHAMFER1_SIZE)

    # Sketch2 → Cut-Extrude1 (cut)
    with BuildSketch(Plane(origin=(25, 0, 0), x_dir=(0, 0, -1), z_dir=(1, 0, 0)).offset(CUT_EXTRUDE1_START)):
        Circle(SKETCH2_R)
        Circle(SKETCH2_R_2, mode=Mode.SUBTRACT)
    extrude(amount=CUT_EXTRUDE1_DEPTH, mode=Mode.SUBTRACT)

    # Sketch4 → Cut-Extrude2 (cut, two sides: drawn at the far end of the back side and taken through both)
    with BuildSketch(Plane(origin=(15, 0, 0), x_dir=(0, 0, -1), z_dir=(1, 0, 0)).offset(-CUT_EXTRUDE2_DEPTH_BACK)):
        Circle(SKETCH4_R)
    extrude(amount=CUT_EXTRUDE2_DEPTH + CUT_EXTRUDE2_DEPTH_BACK, mode=Mode.SUBTRACT)

    # Sketch7 → Cut-Extrude3 (cut)
    with BuildSketch(Plane(origin=(25, 0, 0), x_dir=(0, 0, -1), z_dir=(1, 0, 0)).offset(CUT_EXTRUDE3_START)):
        Circle(SKETCH7_R)
    extrude(amount=CUT_EXTRUDE3_DEPTH, mode=Mode.SUBTRACT)

    # Chamfer2
    chamfer2_edges = [part.edges().sort_by_distance(p)[0] for p in [
        (15, 0, 10),
        (-1, 0, 5),
        (19, 0, 7.5),
        (19, 0, 5),
    ]]
    chamfer(chamfer2_edges, length=CHAMFER2_SIZE)

    # Sketch8 → Cut-Extrude4 (cut, through all)
    with BuildSketch(Plane(origin=(19, 0, 0), x_dir=(0, 0, -1), z_dir=(1, 0, 0))):
        with Locations((0, 5)):
            Rectangle(SKETCH8_W, SKETCH8_H)
    extrude(amount=-CUT_EXTRUDE4_DEPTH, mode=Mode.SUBTRACT)


solid = part.part
